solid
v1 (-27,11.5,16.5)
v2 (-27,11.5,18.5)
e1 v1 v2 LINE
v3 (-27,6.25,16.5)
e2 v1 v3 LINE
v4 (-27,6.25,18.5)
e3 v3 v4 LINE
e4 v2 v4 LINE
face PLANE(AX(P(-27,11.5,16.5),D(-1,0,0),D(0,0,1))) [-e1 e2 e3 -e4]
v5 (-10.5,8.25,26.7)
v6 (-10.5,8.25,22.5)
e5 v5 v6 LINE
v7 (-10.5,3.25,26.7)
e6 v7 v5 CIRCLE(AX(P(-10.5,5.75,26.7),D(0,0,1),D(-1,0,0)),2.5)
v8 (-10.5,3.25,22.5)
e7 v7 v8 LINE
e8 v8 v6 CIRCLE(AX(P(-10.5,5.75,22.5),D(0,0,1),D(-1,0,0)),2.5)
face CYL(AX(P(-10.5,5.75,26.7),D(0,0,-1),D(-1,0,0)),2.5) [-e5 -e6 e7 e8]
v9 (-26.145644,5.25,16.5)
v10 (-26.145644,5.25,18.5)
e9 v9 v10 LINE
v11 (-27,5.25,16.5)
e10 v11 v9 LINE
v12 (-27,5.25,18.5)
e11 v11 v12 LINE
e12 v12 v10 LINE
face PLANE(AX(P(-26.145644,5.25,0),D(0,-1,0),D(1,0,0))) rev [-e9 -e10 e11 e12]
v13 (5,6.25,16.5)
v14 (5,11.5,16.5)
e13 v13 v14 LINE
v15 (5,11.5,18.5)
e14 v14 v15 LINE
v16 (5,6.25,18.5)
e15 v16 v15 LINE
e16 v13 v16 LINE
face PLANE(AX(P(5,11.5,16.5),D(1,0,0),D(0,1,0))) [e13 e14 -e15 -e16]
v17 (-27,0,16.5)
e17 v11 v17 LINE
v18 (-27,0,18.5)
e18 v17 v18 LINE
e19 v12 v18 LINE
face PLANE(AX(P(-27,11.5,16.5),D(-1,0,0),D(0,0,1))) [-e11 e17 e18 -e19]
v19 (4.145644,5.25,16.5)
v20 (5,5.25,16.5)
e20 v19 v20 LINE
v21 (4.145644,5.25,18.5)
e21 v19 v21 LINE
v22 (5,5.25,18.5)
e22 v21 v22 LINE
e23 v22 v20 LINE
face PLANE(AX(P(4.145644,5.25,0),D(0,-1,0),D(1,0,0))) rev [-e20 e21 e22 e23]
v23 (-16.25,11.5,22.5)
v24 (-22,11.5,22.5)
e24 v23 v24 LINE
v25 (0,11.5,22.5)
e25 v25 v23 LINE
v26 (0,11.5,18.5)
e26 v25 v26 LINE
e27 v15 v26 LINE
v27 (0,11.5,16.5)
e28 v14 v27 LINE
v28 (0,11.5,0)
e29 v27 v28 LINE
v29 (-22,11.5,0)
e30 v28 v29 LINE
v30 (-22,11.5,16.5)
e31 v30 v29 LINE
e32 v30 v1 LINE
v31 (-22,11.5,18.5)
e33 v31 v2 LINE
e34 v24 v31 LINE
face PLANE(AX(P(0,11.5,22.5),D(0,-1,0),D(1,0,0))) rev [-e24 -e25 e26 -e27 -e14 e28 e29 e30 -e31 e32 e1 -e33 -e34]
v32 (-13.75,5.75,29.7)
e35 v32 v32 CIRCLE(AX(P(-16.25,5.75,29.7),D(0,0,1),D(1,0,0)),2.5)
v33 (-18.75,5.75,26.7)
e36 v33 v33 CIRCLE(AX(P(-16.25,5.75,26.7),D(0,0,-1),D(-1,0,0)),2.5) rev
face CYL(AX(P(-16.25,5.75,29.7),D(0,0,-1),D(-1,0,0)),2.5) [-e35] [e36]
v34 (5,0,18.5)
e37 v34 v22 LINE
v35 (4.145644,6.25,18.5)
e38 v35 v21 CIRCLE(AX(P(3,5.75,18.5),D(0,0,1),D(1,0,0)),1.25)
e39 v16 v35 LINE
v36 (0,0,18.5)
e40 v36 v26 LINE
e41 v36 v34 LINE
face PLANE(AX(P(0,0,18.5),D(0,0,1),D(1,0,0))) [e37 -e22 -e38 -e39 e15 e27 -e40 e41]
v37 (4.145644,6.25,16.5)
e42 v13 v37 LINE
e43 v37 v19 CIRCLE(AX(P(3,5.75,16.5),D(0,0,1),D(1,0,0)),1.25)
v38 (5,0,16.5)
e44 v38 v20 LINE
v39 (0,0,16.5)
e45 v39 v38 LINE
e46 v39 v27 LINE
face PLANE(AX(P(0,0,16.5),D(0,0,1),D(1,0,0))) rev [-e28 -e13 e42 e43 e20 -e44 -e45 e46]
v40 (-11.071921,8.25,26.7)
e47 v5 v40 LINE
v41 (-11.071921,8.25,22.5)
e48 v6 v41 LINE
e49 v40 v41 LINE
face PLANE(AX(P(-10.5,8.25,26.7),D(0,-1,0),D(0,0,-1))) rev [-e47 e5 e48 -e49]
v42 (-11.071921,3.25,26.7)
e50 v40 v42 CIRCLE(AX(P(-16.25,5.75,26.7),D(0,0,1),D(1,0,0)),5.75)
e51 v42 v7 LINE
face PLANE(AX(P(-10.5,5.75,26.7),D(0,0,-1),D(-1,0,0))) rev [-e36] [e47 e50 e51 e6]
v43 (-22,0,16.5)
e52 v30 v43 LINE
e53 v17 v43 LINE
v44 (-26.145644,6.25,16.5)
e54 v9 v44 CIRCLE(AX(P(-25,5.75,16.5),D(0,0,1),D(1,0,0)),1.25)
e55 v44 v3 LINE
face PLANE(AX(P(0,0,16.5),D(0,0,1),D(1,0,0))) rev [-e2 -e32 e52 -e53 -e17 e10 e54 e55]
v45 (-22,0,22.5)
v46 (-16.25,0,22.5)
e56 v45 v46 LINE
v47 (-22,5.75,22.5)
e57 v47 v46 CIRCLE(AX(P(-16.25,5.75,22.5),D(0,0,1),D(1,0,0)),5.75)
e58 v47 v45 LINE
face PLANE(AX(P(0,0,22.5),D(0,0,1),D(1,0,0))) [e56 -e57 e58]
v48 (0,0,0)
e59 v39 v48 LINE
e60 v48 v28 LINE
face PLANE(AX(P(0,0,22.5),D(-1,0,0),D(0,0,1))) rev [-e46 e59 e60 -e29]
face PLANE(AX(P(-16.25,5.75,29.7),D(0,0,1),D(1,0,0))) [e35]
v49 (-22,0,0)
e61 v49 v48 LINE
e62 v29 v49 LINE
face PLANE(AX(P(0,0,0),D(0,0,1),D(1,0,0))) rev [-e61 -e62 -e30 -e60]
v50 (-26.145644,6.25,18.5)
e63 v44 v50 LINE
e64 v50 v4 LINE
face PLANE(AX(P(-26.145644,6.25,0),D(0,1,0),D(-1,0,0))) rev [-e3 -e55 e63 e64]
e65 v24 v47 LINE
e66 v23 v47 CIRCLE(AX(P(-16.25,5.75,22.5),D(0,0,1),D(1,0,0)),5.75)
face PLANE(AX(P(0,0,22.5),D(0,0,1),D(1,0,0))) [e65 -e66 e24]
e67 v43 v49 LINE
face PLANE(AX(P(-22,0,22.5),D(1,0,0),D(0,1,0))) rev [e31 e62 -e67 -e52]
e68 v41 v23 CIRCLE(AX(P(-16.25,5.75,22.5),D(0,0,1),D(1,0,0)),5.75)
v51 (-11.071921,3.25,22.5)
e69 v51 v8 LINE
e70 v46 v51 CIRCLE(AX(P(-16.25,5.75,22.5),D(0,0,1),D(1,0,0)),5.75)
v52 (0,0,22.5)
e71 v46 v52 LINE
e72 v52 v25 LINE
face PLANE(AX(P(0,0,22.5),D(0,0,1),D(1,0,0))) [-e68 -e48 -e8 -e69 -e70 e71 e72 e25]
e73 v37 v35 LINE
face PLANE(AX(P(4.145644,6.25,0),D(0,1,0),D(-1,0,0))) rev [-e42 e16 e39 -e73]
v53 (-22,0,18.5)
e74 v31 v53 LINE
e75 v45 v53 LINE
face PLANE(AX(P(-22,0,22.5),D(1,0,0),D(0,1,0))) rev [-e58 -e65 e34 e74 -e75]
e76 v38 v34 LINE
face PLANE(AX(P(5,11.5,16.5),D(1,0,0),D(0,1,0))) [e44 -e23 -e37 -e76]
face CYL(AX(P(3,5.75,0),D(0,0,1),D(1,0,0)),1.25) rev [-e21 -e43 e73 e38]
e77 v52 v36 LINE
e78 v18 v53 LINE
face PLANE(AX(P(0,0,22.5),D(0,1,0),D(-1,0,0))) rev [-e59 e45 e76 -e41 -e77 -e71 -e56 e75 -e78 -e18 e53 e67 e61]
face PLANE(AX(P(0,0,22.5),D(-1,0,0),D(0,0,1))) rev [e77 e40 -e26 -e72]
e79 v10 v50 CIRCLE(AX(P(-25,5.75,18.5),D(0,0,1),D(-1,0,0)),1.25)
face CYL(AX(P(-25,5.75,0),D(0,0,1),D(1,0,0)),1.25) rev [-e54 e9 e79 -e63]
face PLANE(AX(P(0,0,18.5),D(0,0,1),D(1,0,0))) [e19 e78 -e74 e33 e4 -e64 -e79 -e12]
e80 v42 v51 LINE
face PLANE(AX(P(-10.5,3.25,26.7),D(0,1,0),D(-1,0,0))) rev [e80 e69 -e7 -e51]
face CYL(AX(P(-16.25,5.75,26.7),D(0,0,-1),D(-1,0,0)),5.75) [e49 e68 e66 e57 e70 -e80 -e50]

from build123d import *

# Parameters (mm, degrees)
ESQUISSE1_W             = 22
ESQUISSE1_H             = 11.5
BOSS_EXTRU_1_DEPTH      = 22.5
ESQUISSE2_W             = 32
ESQUISSE2_H             = 11.5
BOSS_EXTRU_2_DEPTH      = 2
ENL_V_MAT_EXTRU_1_DEPTH = 35.691497517
BOSS_EXTRU_3_DEPTH      = 4.2
ESQUISSE5_R             = 2.5
BOSS_EXTRU_4_DEPTH      = 3


with BuildPart() as part:
    # Esquisse1 → Boss.-Extru.1 (new body)
    with BuildSketch(Plane.XY):
        with Locations((-11, 5.75)):
            Rectangle(ESQUISSE1_W, ESQUISSE1_H)
    extrude(amount=BOSS_EXTRU_1_DEPTH)

    # Esquisse2 → Boss.-Extru.2 (add)
    with BuildSketch(Plane.XY.offset(18.5)):
        with Locations((-11, 5.75)):
            Rectangle(ESQUISSE2_W, ESQUISSE2_H)
    extrude(amount=-BOSS_EXTRU_2_DEPTH)

    # Esquisse3 → Enlèv. mat.-Extru.1 (cut, through all)
    with BuildSketch(Plane.XY.offset(18.5)):
        with BuildLine():
            Line((4.145643924, 6.25), (5, 6.25))
            Line((5, 6.25), (5, 5.25))
            Line((5, 5.25), (4.145643924, 5.25))
            ThreePointArc((4.145643924, 5.25), (1.75, 5.75), (4.145643924, 6.25))
        make_face()
        with BuildLine():
            Line((-26.145643924, 5.25), (-27, 5.25))
            Line((-27, 5.25), (-27, 6.25))
            Line((-27, 6.25), (-26.145643924, 6.25))
            ThreePointArc((-26.145643924, 6.25), (-23.75, 5.75), (-26.145643924, 5.25))
        make_face()
    extrude(amount=-ENL_V_MAT_EXTRU_1_DEPTH, mode=Mode.SUBTRACT)

    # Esquisse4 → Boss.-Extru.3 (add)
    with BuildSketch(Plane.XY.offset(22.5)):
        with BuildLine():
            Line((-10.5, 8.25), (-11.071921206, 8.25))
            ThreePointArc((-11.071921206, 8.25), (-22, 5.75), (-11.071921206, 3.25))
            Line((-11.071921206, 3.25), (-10.5, 3.25))
            ThreePointArc((-10.5, 3.25), (-8, 5.75), (-10.5, 8.25))
        make_face()
    extrude(amount=BOSS_EXTRU_3_DEPTH)

    # Esquisse5 → Boss.-Extru.4 (add)
    with BuildSketch(Plane.XY.offset(26.7)):
        with Locations((-16.25, 5.75)):
            Circle(ESQUISSE5_R)
    extrude(amount=BOSS_EXTRU_4_DEPTH)


solid = part.part
